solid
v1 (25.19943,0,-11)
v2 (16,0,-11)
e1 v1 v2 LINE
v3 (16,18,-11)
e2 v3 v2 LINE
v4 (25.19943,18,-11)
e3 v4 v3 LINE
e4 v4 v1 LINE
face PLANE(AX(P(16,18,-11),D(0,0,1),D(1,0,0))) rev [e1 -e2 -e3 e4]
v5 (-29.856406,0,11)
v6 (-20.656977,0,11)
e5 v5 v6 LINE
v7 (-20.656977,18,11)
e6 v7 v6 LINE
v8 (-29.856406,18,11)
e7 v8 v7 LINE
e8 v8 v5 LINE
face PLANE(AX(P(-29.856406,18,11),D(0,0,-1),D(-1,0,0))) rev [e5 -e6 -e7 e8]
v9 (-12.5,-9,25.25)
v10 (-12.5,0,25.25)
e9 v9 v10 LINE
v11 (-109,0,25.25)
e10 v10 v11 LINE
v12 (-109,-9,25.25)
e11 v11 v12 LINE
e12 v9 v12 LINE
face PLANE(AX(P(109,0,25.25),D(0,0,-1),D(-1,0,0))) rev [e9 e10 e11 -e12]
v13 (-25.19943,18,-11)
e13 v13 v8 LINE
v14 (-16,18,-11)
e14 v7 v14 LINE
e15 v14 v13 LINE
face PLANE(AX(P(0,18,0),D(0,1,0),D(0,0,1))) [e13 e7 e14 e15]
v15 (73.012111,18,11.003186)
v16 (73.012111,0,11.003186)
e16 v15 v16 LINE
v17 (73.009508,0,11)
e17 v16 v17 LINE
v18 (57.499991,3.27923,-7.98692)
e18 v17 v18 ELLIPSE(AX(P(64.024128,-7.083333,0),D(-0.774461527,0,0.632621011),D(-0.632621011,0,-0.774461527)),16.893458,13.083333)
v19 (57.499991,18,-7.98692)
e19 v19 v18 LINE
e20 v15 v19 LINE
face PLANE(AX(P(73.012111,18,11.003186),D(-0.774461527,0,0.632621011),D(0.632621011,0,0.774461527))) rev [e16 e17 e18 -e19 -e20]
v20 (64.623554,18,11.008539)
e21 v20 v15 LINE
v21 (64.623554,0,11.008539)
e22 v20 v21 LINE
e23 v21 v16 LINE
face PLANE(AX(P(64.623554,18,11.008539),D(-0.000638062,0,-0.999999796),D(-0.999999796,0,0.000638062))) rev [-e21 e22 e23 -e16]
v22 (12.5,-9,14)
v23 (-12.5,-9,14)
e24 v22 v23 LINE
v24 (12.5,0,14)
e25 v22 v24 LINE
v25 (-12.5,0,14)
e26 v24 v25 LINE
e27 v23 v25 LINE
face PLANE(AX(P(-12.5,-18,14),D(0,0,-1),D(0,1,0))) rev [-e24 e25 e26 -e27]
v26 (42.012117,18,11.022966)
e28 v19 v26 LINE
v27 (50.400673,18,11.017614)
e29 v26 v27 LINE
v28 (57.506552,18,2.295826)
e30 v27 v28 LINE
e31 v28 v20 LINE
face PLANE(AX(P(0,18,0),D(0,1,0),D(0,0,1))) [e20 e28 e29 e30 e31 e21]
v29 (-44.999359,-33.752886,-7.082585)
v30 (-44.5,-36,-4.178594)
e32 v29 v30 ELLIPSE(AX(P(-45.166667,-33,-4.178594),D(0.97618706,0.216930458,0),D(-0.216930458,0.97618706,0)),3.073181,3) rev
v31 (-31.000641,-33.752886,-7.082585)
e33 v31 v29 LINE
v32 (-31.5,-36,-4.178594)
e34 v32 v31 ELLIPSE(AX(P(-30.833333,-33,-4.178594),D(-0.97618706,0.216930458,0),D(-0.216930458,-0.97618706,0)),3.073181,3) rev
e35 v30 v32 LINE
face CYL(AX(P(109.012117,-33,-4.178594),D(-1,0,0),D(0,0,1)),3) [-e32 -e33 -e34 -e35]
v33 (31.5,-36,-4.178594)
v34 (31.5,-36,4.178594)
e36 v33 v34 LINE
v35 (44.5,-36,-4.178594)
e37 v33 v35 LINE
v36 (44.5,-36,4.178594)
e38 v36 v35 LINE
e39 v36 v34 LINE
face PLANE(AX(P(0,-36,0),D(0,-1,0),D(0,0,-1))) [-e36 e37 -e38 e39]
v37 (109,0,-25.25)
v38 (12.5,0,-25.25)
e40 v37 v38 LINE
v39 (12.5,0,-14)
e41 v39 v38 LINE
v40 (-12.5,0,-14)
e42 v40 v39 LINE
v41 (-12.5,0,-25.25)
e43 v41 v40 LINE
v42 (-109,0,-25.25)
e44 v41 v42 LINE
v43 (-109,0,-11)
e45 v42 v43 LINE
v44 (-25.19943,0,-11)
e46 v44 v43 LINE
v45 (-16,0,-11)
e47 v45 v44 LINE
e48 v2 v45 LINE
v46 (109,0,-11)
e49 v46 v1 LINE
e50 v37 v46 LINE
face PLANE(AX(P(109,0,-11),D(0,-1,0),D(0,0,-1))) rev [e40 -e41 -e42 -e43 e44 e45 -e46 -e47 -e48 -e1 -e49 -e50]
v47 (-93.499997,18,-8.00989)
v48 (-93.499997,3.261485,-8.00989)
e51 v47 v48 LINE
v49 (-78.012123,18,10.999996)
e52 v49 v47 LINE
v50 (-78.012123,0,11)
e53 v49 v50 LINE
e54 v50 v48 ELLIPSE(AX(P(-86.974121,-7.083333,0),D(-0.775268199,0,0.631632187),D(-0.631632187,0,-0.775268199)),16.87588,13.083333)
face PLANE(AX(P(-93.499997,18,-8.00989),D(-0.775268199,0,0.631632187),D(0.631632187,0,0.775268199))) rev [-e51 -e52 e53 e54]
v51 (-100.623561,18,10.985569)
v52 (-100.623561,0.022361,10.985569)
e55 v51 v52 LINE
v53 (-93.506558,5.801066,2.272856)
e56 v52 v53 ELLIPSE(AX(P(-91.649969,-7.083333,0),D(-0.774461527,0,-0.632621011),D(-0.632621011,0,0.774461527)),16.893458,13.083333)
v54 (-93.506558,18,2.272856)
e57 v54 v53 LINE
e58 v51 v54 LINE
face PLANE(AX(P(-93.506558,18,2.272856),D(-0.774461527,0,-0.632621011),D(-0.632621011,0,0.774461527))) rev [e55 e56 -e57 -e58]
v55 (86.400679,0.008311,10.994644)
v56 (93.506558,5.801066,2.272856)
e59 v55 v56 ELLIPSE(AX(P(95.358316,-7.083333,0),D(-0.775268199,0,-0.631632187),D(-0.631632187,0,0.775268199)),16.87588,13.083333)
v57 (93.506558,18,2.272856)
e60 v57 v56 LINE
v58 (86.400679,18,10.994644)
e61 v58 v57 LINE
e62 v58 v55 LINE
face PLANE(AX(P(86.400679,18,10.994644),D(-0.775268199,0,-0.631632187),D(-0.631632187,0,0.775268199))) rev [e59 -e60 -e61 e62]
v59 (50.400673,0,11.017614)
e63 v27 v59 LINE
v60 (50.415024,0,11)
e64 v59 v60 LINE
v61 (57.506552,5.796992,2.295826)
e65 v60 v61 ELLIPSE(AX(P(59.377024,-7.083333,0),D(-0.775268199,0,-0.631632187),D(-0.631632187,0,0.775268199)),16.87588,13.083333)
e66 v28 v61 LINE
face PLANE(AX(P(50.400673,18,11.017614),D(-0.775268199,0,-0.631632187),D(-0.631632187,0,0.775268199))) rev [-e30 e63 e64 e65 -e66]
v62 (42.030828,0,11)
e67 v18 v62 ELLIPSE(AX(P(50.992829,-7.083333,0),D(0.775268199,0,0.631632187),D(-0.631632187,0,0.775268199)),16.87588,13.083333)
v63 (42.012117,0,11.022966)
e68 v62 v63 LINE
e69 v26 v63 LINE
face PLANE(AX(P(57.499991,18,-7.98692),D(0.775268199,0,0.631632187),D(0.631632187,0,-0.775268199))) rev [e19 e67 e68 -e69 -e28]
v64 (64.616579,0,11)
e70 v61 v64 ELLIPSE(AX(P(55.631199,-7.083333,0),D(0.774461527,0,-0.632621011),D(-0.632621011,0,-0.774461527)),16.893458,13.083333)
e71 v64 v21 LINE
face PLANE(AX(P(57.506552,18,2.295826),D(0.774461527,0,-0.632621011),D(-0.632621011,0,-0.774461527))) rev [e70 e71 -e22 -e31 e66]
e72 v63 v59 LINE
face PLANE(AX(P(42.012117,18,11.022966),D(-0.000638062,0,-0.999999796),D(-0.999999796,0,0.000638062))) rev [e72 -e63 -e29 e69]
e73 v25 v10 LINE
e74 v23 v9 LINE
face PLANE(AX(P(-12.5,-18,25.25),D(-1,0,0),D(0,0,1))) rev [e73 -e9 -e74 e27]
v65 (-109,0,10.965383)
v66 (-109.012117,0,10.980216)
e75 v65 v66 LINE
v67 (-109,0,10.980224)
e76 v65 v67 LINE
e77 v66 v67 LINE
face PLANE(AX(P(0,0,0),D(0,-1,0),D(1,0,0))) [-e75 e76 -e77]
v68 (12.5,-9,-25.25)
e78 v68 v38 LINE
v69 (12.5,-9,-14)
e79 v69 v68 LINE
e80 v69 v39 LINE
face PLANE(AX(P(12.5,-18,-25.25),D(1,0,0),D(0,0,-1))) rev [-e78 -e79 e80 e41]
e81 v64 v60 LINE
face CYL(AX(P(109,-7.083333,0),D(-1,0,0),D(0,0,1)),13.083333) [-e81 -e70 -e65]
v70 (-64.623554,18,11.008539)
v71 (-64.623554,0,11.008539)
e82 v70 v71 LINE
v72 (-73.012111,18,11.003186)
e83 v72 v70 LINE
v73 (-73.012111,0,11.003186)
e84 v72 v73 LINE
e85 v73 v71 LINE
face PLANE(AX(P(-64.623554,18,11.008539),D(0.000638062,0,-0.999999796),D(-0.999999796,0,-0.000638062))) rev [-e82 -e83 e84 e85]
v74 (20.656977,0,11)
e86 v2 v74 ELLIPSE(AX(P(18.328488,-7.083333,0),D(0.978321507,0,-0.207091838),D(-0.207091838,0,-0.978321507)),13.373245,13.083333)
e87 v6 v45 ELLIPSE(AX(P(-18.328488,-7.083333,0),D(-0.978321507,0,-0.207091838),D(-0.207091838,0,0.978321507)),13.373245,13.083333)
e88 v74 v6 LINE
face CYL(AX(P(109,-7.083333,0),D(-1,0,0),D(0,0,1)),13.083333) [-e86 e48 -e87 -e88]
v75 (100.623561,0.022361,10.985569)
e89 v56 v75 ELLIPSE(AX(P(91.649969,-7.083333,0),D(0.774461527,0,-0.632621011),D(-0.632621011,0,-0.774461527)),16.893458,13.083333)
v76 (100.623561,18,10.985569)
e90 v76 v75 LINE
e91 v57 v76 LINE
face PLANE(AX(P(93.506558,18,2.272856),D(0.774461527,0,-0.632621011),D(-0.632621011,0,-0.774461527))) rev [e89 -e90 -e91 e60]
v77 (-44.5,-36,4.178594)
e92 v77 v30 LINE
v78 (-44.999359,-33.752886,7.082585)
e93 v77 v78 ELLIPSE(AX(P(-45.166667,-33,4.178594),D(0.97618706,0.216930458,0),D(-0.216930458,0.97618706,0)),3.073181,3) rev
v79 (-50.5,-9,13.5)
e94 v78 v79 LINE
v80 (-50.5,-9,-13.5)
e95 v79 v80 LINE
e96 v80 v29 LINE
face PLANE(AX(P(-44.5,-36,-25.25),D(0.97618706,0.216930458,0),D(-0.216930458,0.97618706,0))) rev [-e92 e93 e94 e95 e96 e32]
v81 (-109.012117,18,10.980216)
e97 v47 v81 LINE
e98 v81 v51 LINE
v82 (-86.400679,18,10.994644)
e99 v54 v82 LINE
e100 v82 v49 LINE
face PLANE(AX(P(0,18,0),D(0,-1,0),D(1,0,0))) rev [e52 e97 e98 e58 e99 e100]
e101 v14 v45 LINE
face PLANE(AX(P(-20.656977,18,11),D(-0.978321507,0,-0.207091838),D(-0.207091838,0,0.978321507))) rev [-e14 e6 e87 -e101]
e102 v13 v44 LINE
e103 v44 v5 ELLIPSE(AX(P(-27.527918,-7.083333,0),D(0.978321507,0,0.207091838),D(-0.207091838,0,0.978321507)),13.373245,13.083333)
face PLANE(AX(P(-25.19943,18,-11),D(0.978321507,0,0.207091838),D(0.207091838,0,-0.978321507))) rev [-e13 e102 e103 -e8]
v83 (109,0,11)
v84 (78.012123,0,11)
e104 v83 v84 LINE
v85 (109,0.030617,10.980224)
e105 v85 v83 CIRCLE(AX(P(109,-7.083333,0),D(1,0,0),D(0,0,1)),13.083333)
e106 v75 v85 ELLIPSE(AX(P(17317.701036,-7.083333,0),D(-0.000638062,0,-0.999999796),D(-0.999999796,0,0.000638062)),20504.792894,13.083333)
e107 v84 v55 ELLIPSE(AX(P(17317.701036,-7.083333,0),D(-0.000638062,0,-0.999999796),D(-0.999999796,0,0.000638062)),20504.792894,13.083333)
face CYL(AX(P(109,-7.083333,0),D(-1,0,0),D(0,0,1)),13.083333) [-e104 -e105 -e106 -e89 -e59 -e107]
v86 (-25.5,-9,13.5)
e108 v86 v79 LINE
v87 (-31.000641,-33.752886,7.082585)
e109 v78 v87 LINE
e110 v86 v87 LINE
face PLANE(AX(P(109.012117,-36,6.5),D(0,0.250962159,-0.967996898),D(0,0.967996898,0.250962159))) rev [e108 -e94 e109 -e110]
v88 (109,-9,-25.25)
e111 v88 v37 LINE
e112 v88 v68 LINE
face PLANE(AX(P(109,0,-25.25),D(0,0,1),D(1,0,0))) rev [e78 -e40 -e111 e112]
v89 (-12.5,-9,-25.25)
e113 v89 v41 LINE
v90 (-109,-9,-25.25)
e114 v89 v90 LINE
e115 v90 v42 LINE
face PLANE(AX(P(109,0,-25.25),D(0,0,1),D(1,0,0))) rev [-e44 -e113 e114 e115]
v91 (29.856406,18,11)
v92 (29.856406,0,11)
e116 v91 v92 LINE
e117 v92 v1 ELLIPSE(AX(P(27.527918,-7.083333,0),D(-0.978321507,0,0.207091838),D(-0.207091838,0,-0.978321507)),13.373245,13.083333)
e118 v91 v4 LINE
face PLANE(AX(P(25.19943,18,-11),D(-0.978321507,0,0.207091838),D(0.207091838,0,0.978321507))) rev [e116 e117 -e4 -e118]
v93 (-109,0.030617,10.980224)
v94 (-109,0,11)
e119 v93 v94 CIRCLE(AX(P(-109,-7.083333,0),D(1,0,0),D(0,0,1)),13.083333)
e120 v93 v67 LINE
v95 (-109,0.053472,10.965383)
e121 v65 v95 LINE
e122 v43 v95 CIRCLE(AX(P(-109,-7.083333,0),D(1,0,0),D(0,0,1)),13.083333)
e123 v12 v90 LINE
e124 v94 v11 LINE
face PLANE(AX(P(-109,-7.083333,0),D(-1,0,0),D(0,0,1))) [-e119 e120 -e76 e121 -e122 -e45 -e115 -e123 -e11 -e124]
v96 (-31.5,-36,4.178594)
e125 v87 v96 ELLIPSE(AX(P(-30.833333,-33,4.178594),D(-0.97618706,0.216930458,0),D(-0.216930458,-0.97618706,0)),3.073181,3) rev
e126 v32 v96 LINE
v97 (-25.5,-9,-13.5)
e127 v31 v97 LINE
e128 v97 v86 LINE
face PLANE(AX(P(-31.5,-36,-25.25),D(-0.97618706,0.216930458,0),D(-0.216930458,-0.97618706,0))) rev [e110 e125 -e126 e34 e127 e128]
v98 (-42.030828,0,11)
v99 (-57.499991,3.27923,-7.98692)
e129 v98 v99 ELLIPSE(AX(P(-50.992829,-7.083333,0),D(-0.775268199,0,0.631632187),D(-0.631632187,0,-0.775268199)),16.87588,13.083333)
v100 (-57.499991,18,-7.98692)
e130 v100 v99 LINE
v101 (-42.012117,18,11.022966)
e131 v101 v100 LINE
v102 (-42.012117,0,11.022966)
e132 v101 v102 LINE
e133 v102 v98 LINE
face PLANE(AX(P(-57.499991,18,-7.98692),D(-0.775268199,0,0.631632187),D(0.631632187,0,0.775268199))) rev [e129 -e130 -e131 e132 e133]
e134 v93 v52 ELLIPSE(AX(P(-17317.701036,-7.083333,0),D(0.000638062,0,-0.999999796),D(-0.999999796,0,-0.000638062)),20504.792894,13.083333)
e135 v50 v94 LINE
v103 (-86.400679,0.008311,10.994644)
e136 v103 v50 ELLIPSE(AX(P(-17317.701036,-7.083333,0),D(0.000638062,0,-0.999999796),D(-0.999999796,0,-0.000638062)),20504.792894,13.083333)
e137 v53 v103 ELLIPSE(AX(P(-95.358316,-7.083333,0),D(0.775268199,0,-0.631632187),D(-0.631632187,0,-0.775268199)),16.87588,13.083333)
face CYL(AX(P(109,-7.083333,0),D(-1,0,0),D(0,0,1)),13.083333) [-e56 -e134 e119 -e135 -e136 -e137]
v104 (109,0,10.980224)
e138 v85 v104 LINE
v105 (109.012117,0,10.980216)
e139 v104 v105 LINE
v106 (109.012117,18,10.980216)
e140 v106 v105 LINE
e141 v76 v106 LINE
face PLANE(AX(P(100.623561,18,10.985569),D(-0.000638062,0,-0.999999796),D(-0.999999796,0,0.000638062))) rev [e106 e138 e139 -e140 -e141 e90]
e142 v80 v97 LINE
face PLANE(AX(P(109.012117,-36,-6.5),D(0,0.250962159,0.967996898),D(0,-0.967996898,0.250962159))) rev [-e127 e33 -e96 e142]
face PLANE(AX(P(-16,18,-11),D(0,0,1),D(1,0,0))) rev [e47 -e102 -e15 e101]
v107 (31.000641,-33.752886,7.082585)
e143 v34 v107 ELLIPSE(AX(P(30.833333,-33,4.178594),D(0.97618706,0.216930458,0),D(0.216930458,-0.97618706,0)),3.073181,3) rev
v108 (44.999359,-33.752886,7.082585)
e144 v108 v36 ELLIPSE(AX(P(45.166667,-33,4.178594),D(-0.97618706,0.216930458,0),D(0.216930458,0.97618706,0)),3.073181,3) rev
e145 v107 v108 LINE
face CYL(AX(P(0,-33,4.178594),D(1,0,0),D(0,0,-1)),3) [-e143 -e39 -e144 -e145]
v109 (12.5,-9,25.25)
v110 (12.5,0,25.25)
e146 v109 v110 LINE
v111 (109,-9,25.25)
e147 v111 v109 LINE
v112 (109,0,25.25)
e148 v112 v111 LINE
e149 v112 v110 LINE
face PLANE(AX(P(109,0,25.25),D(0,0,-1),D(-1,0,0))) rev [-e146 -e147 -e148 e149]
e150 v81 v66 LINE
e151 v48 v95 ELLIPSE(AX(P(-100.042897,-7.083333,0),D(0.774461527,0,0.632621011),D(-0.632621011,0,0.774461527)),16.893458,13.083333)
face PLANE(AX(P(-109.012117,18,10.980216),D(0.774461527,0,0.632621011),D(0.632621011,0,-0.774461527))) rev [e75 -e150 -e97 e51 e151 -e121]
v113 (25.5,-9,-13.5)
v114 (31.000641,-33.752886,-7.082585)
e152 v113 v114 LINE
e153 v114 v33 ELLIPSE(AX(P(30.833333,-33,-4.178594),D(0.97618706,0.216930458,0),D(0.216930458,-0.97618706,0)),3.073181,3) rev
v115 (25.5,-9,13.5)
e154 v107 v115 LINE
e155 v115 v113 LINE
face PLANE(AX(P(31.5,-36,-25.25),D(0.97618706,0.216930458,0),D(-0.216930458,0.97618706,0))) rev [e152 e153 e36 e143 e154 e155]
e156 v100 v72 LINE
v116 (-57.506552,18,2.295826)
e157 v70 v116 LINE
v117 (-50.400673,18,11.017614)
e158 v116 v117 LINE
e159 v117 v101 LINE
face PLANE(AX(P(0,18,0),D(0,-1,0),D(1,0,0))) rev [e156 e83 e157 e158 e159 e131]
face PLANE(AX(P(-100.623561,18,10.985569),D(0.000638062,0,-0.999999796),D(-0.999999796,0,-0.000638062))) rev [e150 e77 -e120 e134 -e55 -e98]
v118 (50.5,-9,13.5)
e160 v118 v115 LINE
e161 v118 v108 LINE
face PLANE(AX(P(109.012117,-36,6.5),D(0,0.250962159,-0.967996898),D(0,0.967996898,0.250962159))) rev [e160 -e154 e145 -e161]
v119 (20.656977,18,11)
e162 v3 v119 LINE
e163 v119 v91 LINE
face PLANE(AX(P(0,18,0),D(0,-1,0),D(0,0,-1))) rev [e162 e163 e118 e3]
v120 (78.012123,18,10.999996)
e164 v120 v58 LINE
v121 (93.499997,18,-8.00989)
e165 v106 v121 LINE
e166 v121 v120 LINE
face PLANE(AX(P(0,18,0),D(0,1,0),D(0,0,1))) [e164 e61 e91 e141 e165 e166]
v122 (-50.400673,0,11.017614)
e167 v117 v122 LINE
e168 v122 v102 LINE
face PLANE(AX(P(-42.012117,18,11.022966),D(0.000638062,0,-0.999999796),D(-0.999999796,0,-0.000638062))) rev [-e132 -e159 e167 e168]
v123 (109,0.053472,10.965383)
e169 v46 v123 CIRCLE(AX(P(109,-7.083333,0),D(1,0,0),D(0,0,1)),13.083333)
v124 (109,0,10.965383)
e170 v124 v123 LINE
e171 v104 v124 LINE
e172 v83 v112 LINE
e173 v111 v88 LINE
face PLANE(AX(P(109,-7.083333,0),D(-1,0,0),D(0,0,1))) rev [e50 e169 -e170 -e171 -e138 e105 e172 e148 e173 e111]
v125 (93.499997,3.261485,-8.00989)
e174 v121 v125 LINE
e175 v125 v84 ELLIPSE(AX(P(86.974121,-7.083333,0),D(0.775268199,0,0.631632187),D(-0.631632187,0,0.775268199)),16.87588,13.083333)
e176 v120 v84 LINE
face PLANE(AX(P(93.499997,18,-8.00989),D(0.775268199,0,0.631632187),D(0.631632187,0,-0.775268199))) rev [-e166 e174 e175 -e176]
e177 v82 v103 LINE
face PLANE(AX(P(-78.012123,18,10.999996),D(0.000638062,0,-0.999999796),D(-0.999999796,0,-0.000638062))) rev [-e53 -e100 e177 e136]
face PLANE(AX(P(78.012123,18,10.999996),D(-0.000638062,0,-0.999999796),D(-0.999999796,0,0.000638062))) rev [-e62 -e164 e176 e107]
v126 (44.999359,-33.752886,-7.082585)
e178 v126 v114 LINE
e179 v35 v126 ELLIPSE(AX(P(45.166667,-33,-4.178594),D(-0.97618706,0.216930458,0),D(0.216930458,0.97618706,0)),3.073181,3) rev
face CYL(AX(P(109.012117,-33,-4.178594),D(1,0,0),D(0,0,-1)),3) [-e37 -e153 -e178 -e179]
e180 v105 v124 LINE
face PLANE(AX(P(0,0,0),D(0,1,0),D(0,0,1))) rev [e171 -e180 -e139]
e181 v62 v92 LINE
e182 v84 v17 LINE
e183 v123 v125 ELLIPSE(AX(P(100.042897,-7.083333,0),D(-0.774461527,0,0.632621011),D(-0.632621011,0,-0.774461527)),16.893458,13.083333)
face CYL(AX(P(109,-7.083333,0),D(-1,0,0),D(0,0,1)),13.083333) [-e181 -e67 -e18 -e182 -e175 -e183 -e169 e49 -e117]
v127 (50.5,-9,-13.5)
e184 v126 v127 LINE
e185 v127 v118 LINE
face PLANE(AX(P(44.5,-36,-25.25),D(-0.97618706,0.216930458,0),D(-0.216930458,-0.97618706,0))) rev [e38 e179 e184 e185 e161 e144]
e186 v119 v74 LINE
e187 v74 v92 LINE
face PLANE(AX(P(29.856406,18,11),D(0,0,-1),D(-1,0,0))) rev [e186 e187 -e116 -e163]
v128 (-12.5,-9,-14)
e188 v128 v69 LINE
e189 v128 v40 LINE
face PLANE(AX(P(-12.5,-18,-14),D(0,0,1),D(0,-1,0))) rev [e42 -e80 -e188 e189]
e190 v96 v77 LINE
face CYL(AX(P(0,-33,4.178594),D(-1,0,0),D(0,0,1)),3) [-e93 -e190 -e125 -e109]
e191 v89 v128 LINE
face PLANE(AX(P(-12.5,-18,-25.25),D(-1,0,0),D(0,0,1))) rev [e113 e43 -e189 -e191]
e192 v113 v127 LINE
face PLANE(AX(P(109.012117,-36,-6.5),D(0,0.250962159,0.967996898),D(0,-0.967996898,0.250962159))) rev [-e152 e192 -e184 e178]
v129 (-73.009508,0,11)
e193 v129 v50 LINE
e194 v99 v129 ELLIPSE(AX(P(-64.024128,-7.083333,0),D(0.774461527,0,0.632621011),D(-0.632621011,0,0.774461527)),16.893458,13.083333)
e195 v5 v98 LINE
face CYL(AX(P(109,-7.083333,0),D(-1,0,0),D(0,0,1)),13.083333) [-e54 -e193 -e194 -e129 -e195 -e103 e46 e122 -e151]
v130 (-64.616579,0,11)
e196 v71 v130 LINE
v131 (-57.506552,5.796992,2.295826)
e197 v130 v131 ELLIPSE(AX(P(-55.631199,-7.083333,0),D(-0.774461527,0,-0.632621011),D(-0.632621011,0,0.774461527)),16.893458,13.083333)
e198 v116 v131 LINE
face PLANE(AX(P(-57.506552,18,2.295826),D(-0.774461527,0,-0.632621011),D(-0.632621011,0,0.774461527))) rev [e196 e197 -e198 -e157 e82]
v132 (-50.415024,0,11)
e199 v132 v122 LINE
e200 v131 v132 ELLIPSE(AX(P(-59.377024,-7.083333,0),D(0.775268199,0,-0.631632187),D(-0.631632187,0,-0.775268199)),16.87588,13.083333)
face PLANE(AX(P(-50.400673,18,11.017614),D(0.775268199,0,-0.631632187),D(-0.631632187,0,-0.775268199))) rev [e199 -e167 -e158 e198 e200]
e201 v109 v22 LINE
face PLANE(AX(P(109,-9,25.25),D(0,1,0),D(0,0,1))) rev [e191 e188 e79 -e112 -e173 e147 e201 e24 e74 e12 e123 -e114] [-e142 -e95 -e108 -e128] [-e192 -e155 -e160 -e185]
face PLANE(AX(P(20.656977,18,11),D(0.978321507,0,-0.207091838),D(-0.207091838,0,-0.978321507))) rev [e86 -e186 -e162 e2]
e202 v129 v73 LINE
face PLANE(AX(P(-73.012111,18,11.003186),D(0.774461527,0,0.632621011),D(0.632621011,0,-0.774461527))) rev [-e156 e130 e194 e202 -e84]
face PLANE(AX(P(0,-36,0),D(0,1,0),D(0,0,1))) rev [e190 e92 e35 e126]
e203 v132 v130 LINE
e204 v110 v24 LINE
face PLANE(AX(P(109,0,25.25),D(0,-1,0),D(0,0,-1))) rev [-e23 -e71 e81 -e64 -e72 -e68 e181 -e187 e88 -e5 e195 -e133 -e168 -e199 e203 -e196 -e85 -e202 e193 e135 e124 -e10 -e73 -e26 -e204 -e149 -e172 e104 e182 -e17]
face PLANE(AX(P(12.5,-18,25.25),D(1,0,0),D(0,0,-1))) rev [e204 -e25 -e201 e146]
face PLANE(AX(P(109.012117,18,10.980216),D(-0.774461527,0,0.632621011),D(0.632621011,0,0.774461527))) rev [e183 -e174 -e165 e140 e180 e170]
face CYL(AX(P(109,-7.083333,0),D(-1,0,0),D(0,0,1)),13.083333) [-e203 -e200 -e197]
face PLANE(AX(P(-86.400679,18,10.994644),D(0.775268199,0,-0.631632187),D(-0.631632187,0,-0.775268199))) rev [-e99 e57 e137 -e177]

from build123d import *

# Parameters (mm, degrees)
EXTRUDE_1_DEPTH     = 109
EXTRUDE_2_DEPTH     = 18
SKETCH_3_W          = 25
SKETCH_3_H          = 11.25
CUT_EXTRUDE_1_DEPTH = 18
SKETCH_4_W          = 25
SKETCH_4_H          = 27
EXTRUDE_3_DEPTH     = 27
CUT_EXTRUDE_2_DEPTH = 122.166018853
CUT_EXTRUDE_3_DEPTH = 166.462013552
FILLET_1_R          = 3


# Read off the part's stored shape, not the designer's step: Бобышка-Вытянуть2
with BuildPart() as part:
    # Эскиз1 → Бобышка-Вытянуть1 (new, symmetric)
    with BuildSketch(Plane(origin=(0, 0, 0), x_dir=(0, 0, -1), z_dir=(1, 0, 0))):
        with BuildLine():
            Line((11, 0), (25.25, 0))
            Line((25.25, 0), (25.25, -9))
            Line((25.25, -9), (-25.25, -9))
            Line((-25.25, -9), (-25.25, 0))
            Line((-25.25, 0), (-11, 0))
            ThreePointArc((-11, 0), (0, 6), (11, 0))
        make_face()
    extrude(amount=EXTRUDE_1_DEPTH, both=True)

    # Бобышка-Вытянуть2 outline → Бобышка-Вытянуть2 (add)
    with BuildSketch(Plane(origin=(0, 0, 0), x_dir=(1, 0, 0), z_dir=(0, 1, 0))):
        Polygon((16, 11), (20.656976684, -11), (29.856406461, -11), (25.199429777, 11), align=None)
        Polygon((-29.856406461, -11), (-20.656976684, -11), (-16, 11), (-25.199429777, 11), align=None)
        Polygon((78.012123179, -10.999996132), (86.400679256, -10.994643711), (93.506557878, -2.272856192), (100.623560797, -10.985568626), (109.012116871, -10.980216204), (93.499996845, 8.009889964), align=None)
        Polygon((64.623554487, -11.008538874), (73.012110561, -11.003186452), (57.499990534, 7.986919716), (42.012116871, -11.02296638), (50.400672946, -11.017613959), (57.506551567, -2.29582644), align=None)
        Polygon((-109.012116871, -10.980216204), (-100.623560797, -10.985568626), (-93.506557878, -2.272856192), (-86.400679256, -10.994643711), (-78.012123179, -10.999996132), (-93.499996845, 8.009889964), align=None)
        Polygon((-73.012110561, -11.003186452), (-64.623554487, -11.008538874), (-57.506551567, -2.29582644), (-50.400672946, -11.017613959), (-42.012116871, -11.02296638), (-57.499990534, 7.986919716), align=None)
    extrude(amount=EXTRUDE_2_DEPTH)

    # Эскиз3 → Вырез-Вытянуть1 (cut)
    with BuildSketch(Plane(origin=(0, 0, 0), x_dir=(1, 0, 0), z_dir=(0, 1, 0))):
        with Locations((0, 19.625)):
            Rectangle(SKETCH_3_W, SKETCH_3_H)
        with Locations((0, -19.625)):
            Rectangle(SKETCH_3_W, SKETCH_3_H)
    extrude(amount=-CUT_EXTRUDE_1_DEPTH, mode=Mode.SUBTRACT)

    # Эскиз4 → Бобышка-Вытянуть3 (add)
    with BuildSketch(Plane.XZ.offset(9)):
        with Locations((38, 0)):
            Rectangle(SKETCH_4_W, SKETCH_4_H)
        with Locations((-38, 0)):
            Rectangle(SKETCH_4_W, SKETCH_4_H)
    extrude(amount=EXTRUDE_3_DEPTH)

    # Эскиз6 → Вырез-Вытянуть2 (cut, through all)
    with BuildSketch(Plane.XY.offset(13.5)):
        Polygon((-50.5, -9), (-50.5, -36), (-44.5, -36), align=None)
        Polygon((-25.5, -36), (-31.5, -36), (-25.5, -9), align=None)
        Polygon((25.5, -9), (25.5, -36), (31.5, -36), align=None)
        Polygon((50.5, -36), (44.5, -36), (50.5, -9), align=None)
    extrude(amount=-CUT_EXTRUDE_2_DEPTH, mode=Mode.SUBTRACT)

    # Эскиз5 → Вырез-Вытянуть3 (cut, through all)
    with BuildSketch(Plane.ZY.offset(50.5)):
        Polygon((-13.5, -9), (-13.5, -36), (-6.5, -36), align=None)
        Polygon((13.5, -36), (6.5, -36), (13.5, -9), align=None)
    extrude(amount=-CUT_EXTRUDE_3_DEPTH, mode=Mode.SUBTRACT)

    # Скругление1
    fillet_1_edges = [part.edges().sort_by_distance(p)[0] for p in [
        (-38, -36, -6.5),
        (38, -36, -6.5),
        (-38, -36, 6.5),
        (38, -36, 6.5),
    ]]
    fillet(fillet_1_edges, radius=FILLET_1_R)


solid = part.part
